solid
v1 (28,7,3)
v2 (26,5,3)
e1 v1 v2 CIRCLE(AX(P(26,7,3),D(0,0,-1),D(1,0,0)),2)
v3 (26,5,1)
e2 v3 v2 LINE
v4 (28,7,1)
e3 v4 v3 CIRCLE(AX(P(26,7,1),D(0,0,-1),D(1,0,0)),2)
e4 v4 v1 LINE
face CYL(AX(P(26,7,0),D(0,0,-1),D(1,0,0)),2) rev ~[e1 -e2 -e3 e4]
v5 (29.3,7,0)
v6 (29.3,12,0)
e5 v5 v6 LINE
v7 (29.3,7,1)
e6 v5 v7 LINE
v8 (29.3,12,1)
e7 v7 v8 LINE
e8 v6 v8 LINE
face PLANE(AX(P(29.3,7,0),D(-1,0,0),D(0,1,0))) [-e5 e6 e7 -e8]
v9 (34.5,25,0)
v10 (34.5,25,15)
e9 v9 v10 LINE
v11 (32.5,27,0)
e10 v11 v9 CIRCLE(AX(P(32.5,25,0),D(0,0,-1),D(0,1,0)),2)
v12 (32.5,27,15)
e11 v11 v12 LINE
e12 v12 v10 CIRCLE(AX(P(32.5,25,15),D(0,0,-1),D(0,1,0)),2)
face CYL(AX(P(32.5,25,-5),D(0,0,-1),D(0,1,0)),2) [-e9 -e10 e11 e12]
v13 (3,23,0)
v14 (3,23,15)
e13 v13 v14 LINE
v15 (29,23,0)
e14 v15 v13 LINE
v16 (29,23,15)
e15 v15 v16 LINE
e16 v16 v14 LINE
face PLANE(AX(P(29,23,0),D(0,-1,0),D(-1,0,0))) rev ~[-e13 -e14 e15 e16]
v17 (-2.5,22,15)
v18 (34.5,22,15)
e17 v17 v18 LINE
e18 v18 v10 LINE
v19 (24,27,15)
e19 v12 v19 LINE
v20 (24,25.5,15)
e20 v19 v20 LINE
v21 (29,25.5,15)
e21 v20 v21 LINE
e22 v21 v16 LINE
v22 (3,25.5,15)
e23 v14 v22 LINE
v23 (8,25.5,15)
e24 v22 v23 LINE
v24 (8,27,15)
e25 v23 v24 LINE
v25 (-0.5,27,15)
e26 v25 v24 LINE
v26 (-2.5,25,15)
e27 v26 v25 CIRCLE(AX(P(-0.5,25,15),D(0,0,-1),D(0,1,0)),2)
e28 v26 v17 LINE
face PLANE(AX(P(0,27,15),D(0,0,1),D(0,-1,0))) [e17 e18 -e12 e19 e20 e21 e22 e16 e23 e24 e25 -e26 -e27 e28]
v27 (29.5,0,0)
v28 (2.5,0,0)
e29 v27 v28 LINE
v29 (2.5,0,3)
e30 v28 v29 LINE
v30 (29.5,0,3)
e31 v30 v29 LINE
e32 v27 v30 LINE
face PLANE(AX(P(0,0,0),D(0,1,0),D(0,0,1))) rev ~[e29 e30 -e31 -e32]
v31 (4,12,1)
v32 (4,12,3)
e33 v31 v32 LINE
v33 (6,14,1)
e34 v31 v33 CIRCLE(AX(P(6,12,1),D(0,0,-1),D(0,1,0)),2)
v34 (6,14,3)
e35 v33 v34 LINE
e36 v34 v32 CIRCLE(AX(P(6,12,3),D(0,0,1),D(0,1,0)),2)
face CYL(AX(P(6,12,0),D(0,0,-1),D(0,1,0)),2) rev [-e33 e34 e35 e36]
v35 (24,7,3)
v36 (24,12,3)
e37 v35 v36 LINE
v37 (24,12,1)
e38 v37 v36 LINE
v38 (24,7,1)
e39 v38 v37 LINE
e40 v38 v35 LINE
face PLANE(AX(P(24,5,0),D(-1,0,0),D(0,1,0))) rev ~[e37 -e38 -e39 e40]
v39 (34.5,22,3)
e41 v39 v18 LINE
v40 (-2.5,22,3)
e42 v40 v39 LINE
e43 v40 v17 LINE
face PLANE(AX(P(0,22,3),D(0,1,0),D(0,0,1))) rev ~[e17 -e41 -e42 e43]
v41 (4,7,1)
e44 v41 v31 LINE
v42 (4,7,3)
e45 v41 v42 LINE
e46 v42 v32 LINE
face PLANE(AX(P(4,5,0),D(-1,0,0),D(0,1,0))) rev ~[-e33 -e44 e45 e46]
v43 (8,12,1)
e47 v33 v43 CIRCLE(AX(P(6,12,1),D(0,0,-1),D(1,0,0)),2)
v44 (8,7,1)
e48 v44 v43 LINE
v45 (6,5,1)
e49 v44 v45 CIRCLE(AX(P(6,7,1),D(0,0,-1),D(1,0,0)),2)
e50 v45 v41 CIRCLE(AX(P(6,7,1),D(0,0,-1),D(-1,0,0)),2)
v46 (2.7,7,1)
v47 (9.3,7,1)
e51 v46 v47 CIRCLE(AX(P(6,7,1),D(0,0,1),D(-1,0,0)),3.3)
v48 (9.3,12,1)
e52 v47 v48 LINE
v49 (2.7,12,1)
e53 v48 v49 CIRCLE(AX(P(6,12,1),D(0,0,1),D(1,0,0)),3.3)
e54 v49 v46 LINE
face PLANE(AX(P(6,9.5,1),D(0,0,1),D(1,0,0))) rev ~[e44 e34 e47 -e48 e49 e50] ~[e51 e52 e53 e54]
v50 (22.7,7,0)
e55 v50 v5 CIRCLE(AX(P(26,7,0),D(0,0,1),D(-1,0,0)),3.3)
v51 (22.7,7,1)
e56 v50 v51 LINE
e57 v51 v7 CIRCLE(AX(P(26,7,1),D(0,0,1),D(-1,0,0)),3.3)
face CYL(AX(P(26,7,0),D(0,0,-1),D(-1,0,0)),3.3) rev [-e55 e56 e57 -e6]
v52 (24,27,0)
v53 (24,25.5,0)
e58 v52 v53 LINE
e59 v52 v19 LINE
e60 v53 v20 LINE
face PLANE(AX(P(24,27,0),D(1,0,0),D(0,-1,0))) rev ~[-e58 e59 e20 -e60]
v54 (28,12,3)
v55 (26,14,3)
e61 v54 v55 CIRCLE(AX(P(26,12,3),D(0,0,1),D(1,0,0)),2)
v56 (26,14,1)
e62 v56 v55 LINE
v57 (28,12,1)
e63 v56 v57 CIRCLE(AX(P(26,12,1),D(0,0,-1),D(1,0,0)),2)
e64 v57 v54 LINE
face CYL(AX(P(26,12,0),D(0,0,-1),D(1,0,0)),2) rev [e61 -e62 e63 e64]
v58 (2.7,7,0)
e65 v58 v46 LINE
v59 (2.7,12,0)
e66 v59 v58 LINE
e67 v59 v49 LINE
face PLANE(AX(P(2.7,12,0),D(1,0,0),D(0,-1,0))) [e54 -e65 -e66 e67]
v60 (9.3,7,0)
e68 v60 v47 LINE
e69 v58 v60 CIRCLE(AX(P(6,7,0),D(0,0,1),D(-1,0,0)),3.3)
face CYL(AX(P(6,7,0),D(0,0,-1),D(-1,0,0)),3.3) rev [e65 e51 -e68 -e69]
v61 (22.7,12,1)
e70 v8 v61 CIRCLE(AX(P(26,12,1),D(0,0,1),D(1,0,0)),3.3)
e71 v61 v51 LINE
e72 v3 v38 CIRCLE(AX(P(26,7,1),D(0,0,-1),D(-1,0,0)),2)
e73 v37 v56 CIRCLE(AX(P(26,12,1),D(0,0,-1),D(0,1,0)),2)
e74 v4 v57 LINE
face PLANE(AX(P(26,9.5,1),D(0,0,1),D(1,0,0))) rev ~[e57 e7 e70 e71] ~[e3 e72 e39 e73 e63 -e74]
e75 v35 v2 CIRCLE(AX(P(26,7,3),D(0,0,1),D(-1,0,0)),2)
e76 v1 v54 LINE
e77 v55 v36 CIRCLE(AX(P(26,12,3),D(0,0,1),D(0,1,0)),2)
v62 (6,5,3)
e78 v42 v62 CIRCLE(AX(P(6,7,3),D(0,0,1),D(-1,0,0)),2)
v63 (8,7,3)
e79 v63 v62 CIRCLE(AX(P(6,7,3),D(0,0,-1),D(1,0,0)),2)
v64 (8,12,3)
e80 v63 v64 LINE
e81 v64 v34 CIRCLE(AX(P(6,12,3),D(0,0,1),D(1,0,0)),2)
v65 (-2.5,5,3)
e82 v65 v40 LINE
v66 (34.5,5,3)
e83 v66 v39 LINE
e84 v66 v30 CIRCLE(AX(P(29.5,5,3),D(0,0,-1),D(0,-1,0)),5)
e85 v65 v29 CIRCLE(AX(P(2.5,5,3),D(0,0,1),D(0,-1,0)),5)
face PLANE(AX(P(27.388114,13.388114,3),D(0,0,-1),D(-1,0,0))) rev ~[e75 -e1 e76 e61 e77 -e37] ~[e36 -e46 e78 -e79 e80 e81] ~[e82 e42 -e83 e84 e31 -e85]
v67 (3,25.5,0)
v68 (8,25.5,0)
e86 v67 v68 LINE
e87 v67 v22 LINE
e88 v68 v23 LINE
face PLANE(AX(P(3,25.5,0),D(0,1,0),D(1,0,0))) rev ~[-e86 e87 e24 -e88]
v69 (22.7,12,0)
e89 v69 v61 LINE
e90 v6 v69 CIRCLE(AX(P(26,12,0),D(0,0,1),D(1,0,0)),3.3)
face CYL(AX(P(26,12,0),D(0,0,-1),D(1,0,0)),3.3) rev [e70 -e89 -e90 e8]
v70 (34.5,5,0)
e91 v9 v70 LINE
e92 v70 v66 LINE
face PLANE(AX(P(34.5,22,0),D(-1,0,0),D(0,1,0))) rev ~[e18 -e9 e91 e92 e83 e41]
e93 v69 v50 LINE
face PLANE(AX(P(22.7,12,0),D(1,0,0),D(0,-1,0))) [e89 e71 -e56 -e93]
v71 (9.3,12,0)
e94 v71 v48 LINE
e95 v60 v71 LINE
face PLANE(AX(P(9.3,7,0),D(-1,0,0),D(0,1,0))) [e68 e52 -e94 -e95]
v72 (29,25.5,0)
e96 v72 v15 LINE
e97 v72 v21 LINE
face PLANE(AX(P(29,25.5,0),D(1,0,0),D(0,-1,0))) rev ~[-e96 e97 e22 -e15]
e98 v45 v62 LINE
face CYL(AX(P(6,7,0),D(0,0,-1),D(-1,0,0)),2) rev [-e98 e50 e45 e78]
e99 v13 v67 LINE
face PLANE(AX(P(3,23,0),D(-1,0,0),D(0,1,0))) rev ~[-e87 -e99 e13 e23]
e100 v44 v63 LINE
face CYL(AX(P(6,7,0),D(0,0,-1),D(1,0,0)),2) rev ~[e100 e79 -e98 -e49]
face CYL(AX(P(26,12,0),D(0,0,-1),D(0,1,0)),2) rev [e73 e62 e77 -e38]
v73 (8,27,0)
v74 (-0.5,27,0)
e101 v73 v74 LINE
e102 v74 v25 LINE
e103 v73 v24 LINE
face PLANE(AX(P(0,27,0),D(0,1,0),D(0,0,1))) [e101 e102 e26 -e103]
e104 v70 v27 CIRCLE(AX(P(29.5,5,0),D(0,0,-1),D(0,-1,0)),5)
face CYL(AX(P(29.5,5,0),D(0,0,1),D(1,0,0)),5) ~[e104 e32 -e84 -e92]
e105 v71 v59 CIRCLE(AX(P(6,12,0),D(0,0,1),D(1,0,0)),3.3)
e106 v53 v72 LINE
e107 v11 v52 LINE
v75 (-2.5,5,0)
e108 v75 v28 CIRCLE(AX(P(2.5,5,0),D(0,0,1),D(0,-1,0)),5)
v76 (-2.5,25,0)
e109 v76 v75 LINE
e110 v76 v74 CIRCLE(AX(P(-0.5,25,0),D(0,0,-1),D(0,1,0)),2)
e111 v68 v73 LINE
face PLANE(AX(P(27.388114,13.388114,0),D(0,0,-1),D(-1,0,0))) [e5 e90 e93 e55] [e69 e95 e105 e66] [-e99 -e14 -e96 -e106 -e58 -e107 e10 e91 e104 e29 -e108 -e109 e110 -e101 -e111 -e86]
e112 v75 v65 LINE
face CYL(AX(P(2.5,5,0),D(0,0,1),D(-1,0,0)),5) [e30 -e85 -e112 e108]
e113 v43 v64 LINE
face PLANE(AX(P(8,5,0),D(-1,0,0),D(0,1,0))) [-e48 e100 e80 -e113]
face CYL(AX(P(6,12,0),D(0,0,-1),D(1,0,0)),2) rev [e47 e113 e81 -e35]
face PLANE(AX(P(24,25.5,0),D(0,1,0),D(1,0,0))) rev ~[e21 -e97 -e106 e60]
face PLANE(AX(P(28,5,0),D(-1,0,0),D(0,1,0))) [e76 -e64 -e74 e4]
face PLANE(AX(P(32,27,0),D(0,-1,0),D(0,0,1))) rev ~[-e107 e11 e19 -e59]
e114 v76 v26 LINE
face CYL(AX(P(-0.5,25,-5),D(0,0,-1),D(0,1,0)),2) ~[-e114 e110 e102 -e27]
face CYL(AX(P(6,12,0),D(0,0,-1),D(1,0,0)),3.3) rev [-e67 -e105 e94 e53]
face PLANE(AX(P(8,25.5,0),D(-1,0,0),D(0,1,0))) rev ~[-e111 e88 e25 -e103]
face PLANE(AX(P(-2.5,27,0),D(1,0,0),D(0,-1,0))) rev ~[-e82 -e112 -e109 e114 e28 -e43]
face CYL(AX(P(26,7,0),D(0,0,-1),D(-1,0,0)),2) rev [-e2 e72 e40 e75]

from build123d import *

# Parameters (mm, degrees)
F0_W        = 16
F0_H        = 22
F0_W_2      = 4
F0_H_2      = 9
F1_DEPTH    = 3
F2_DEPTH    = 15
F3_DEPTH    = 2.5
F4_DEPTH    = 2.5
F5_T1_DEPTH = 3
F5_T3_DEPTH = 25
F7_W        = 4
F7_H        = 9
F8_DEPTH    = 1
F10_DEPTH   = 1
F11_R       = 5


# Not quite as in the source:
# - a fillet or chamfer that OpenCascade refuses, or shapes differently, is made with other operations: its cross-section is extruded or revolved along the edge and cut away or added
# - two fillets or chamfers of one size are made in one step


with BuildPart() as f1:
    # F0 (on Top) → F1 (new body)
    with BuildSketch(Plane.XY):
        with Locations((8, 11)):
            Rectangle(F0_W, F0_H)
        with Locations((6, 9.5)):
            Rectangle(F0_W_2, F0_H_2, mode=Mode.SUBTRACT)
        with Locations((24, 11)):
            Rectangle(F0_W, F0_H)
        with Locations((26, 9.5)):
            Rectangle(F0_W_2, F0_H_2, mode=Mode.SUBTRACT)
    extrude(amount=F1_DEPTH)

    # F0 (on Top) → F2 (join)
    with BuildSketch(Plane.XY):
        Polygon((0, 27), (0, 23), (3, 23), (3, 25.5), (8, 25.5), (8, 27), align=None)
        Polygon((0, 23), (0, 22), (16, 22), (16, 23), (3, 23), align=None)
        Polygon((16, 23), (16, 22), (32, 22), (32, 23), (29, 23), align=None)
        Polygon((29, 23), (32, 23), (32, 27), (24, 27), (24, 25.5), (29, 25.5), align=None)
    extrude(amount=F2_DEPTH)

    # F3 (add): a face of the model
    f3_faces = [f1.faces().sort_by_distance(p)[0] for p in [
        (32, 0.3088689042, 1.5),
    ]]
    extrude(f3_faces, amount=F3_DEPTH)

    # F4 (add): a face of the model
    f4_faces = [f1.faces().sort_by_distance(p)[0] for p in [
        (0, 0.3088689042, 1.5),
    ]]
    extrude(f4_faces, amount=F4_DEPTH)

    # F5: fillet of radius 2 on 10 edges, made by hand

    # F5_s2 → F5_t1 (join)
    with BuildSketch(Plane.XY):
        with BuildLine():
            ThreePointArc((28, 12), (27.4142135624, 13.4142135624), (26, 14))
            Line((26, 14), (28, 14))
            Line((28, 14), (28, 12))
        make_face()
        with BuildLine():
            ThreePointArc((28, 7), (27.4142135624, 5.5857864376), (26, 5))
            Line((26, 5), (28, 5))
            Line((28, 5), (28, 7))
        make_face()
        with BuildLine():
            ThreePointArc((26, 14), (24.5857864376, 13.4142135624), (24, 12))
            Line((24, 12), (24, 14))
            Line((24, 14), (26, 14))
        make_face()
        with BuildLine():
            ThreePointArc((24, 7), (24.5857864376, 5.5857864376), (26, 5))
            Line((26, 5), (24, 5))
            Line((24, 5), (24, 7))
        make_face()
        with BuildLine():
            ThreePointArc((8, 12), (7.4142135624, 13.4142135624), (6, 14))
            Line((6, 14), (8, 14))
            Line((8, 14), (8, 12))
        make_face()
        with BuildLine():
            ThreePointArc((8, 7), (7.4142135624, 5.5857864376), (6, 5))
            Line((6, 5), (8, 5))
            Line((8, 5), (8, 7))
        make_face()
        with BuildLine():
            ThreePointArc((6, 14), (4.5857864376, 13.4142135624), (4, 12))
            Line((4, 12), (4, 14))
            Line((4, 14), (6, 14))
        make_face()
        with BuildLine():
            ThreePointArc((4, 7), (4.5857864376, 5.5857864376), (6, 5))
            Line((6, 5), (4, 5))
            Line((4, 5), (4, 7))
        make_face()
    extrude(amount=F5_T1_DEPTH)

    # F5_s4 → F5_t3 (cut)
    with BuildSketch(Plane.XY.offset(-5)):
        with BuildLine():
            ThreePointArc((32.5, 27), (33.9142135624, 26.4142135624), (34.5, 25))
            Line((34.5, 25), (34.5, 27))
            Line((34.5, 27), (32.5, 27))
        make_face()
        with BuildLine():
            ThreePointArc((-0.5, 27), (-1.9142135624, 26.4142135624), (-2.5, 25))
            Line((-2.5, 25), (-2.5, 27))
            Line((-2.5, 27), (-0.5, 27))
        make_face()
    extrude(amount=F5_T3_DEPTH, mode=Mode.SUBTRACT)

    # F7 (on face) → F8 (cut)
    with BuildSketch(Plane.XY):
        with BuildLine():
            Line((2.7, 12), (2.7, 7))
            ThreePointArc((2.7000000011, 7), (6, 3.7000000011), (9.2999999989, 7))
            Line((9.3, 7), (9.3, 12))
            ThreePointArc((9.3, 12), (6, 15.3), (2.7, 12))
        make_face()
        with Locations((6, 9.5)):
            Rectangle(F7_W, F7_H, mode=Mode.SUBTRACT)
        with Locations((6, 9.5)):
            Rectangle(F7_W, F7_H)
    extrude(amount=F8_DEPTH, mode=Mode.SUBTRACT)

    # F9 (on face) → F10 (cut)
    with BuildSketch(Plane.XY):
        with BuildLine():
            Line((22.7, 12), (22.7, 7))
            ThreePointArc((22.7, 7), (26, 3.7), (29.3, 7))
            Line((29.3, 7), (29.3, 12))
            ThreePointArc((29.3, 12), (26, 15.3), (22.7, 12))
        make_face()
    extrude(amount=F10_DEPTH, mode=Mode.SUBTRACT)

    # F11
    f11_edges = [f1.edges().sort_by_distance(p)[0] for p in [
        (34.5, 0, 1.5),
        (-2.5, 0, 1.5),
    ]]
    fillet(f11_edges, radius=F11_R)


solid = f1.part
